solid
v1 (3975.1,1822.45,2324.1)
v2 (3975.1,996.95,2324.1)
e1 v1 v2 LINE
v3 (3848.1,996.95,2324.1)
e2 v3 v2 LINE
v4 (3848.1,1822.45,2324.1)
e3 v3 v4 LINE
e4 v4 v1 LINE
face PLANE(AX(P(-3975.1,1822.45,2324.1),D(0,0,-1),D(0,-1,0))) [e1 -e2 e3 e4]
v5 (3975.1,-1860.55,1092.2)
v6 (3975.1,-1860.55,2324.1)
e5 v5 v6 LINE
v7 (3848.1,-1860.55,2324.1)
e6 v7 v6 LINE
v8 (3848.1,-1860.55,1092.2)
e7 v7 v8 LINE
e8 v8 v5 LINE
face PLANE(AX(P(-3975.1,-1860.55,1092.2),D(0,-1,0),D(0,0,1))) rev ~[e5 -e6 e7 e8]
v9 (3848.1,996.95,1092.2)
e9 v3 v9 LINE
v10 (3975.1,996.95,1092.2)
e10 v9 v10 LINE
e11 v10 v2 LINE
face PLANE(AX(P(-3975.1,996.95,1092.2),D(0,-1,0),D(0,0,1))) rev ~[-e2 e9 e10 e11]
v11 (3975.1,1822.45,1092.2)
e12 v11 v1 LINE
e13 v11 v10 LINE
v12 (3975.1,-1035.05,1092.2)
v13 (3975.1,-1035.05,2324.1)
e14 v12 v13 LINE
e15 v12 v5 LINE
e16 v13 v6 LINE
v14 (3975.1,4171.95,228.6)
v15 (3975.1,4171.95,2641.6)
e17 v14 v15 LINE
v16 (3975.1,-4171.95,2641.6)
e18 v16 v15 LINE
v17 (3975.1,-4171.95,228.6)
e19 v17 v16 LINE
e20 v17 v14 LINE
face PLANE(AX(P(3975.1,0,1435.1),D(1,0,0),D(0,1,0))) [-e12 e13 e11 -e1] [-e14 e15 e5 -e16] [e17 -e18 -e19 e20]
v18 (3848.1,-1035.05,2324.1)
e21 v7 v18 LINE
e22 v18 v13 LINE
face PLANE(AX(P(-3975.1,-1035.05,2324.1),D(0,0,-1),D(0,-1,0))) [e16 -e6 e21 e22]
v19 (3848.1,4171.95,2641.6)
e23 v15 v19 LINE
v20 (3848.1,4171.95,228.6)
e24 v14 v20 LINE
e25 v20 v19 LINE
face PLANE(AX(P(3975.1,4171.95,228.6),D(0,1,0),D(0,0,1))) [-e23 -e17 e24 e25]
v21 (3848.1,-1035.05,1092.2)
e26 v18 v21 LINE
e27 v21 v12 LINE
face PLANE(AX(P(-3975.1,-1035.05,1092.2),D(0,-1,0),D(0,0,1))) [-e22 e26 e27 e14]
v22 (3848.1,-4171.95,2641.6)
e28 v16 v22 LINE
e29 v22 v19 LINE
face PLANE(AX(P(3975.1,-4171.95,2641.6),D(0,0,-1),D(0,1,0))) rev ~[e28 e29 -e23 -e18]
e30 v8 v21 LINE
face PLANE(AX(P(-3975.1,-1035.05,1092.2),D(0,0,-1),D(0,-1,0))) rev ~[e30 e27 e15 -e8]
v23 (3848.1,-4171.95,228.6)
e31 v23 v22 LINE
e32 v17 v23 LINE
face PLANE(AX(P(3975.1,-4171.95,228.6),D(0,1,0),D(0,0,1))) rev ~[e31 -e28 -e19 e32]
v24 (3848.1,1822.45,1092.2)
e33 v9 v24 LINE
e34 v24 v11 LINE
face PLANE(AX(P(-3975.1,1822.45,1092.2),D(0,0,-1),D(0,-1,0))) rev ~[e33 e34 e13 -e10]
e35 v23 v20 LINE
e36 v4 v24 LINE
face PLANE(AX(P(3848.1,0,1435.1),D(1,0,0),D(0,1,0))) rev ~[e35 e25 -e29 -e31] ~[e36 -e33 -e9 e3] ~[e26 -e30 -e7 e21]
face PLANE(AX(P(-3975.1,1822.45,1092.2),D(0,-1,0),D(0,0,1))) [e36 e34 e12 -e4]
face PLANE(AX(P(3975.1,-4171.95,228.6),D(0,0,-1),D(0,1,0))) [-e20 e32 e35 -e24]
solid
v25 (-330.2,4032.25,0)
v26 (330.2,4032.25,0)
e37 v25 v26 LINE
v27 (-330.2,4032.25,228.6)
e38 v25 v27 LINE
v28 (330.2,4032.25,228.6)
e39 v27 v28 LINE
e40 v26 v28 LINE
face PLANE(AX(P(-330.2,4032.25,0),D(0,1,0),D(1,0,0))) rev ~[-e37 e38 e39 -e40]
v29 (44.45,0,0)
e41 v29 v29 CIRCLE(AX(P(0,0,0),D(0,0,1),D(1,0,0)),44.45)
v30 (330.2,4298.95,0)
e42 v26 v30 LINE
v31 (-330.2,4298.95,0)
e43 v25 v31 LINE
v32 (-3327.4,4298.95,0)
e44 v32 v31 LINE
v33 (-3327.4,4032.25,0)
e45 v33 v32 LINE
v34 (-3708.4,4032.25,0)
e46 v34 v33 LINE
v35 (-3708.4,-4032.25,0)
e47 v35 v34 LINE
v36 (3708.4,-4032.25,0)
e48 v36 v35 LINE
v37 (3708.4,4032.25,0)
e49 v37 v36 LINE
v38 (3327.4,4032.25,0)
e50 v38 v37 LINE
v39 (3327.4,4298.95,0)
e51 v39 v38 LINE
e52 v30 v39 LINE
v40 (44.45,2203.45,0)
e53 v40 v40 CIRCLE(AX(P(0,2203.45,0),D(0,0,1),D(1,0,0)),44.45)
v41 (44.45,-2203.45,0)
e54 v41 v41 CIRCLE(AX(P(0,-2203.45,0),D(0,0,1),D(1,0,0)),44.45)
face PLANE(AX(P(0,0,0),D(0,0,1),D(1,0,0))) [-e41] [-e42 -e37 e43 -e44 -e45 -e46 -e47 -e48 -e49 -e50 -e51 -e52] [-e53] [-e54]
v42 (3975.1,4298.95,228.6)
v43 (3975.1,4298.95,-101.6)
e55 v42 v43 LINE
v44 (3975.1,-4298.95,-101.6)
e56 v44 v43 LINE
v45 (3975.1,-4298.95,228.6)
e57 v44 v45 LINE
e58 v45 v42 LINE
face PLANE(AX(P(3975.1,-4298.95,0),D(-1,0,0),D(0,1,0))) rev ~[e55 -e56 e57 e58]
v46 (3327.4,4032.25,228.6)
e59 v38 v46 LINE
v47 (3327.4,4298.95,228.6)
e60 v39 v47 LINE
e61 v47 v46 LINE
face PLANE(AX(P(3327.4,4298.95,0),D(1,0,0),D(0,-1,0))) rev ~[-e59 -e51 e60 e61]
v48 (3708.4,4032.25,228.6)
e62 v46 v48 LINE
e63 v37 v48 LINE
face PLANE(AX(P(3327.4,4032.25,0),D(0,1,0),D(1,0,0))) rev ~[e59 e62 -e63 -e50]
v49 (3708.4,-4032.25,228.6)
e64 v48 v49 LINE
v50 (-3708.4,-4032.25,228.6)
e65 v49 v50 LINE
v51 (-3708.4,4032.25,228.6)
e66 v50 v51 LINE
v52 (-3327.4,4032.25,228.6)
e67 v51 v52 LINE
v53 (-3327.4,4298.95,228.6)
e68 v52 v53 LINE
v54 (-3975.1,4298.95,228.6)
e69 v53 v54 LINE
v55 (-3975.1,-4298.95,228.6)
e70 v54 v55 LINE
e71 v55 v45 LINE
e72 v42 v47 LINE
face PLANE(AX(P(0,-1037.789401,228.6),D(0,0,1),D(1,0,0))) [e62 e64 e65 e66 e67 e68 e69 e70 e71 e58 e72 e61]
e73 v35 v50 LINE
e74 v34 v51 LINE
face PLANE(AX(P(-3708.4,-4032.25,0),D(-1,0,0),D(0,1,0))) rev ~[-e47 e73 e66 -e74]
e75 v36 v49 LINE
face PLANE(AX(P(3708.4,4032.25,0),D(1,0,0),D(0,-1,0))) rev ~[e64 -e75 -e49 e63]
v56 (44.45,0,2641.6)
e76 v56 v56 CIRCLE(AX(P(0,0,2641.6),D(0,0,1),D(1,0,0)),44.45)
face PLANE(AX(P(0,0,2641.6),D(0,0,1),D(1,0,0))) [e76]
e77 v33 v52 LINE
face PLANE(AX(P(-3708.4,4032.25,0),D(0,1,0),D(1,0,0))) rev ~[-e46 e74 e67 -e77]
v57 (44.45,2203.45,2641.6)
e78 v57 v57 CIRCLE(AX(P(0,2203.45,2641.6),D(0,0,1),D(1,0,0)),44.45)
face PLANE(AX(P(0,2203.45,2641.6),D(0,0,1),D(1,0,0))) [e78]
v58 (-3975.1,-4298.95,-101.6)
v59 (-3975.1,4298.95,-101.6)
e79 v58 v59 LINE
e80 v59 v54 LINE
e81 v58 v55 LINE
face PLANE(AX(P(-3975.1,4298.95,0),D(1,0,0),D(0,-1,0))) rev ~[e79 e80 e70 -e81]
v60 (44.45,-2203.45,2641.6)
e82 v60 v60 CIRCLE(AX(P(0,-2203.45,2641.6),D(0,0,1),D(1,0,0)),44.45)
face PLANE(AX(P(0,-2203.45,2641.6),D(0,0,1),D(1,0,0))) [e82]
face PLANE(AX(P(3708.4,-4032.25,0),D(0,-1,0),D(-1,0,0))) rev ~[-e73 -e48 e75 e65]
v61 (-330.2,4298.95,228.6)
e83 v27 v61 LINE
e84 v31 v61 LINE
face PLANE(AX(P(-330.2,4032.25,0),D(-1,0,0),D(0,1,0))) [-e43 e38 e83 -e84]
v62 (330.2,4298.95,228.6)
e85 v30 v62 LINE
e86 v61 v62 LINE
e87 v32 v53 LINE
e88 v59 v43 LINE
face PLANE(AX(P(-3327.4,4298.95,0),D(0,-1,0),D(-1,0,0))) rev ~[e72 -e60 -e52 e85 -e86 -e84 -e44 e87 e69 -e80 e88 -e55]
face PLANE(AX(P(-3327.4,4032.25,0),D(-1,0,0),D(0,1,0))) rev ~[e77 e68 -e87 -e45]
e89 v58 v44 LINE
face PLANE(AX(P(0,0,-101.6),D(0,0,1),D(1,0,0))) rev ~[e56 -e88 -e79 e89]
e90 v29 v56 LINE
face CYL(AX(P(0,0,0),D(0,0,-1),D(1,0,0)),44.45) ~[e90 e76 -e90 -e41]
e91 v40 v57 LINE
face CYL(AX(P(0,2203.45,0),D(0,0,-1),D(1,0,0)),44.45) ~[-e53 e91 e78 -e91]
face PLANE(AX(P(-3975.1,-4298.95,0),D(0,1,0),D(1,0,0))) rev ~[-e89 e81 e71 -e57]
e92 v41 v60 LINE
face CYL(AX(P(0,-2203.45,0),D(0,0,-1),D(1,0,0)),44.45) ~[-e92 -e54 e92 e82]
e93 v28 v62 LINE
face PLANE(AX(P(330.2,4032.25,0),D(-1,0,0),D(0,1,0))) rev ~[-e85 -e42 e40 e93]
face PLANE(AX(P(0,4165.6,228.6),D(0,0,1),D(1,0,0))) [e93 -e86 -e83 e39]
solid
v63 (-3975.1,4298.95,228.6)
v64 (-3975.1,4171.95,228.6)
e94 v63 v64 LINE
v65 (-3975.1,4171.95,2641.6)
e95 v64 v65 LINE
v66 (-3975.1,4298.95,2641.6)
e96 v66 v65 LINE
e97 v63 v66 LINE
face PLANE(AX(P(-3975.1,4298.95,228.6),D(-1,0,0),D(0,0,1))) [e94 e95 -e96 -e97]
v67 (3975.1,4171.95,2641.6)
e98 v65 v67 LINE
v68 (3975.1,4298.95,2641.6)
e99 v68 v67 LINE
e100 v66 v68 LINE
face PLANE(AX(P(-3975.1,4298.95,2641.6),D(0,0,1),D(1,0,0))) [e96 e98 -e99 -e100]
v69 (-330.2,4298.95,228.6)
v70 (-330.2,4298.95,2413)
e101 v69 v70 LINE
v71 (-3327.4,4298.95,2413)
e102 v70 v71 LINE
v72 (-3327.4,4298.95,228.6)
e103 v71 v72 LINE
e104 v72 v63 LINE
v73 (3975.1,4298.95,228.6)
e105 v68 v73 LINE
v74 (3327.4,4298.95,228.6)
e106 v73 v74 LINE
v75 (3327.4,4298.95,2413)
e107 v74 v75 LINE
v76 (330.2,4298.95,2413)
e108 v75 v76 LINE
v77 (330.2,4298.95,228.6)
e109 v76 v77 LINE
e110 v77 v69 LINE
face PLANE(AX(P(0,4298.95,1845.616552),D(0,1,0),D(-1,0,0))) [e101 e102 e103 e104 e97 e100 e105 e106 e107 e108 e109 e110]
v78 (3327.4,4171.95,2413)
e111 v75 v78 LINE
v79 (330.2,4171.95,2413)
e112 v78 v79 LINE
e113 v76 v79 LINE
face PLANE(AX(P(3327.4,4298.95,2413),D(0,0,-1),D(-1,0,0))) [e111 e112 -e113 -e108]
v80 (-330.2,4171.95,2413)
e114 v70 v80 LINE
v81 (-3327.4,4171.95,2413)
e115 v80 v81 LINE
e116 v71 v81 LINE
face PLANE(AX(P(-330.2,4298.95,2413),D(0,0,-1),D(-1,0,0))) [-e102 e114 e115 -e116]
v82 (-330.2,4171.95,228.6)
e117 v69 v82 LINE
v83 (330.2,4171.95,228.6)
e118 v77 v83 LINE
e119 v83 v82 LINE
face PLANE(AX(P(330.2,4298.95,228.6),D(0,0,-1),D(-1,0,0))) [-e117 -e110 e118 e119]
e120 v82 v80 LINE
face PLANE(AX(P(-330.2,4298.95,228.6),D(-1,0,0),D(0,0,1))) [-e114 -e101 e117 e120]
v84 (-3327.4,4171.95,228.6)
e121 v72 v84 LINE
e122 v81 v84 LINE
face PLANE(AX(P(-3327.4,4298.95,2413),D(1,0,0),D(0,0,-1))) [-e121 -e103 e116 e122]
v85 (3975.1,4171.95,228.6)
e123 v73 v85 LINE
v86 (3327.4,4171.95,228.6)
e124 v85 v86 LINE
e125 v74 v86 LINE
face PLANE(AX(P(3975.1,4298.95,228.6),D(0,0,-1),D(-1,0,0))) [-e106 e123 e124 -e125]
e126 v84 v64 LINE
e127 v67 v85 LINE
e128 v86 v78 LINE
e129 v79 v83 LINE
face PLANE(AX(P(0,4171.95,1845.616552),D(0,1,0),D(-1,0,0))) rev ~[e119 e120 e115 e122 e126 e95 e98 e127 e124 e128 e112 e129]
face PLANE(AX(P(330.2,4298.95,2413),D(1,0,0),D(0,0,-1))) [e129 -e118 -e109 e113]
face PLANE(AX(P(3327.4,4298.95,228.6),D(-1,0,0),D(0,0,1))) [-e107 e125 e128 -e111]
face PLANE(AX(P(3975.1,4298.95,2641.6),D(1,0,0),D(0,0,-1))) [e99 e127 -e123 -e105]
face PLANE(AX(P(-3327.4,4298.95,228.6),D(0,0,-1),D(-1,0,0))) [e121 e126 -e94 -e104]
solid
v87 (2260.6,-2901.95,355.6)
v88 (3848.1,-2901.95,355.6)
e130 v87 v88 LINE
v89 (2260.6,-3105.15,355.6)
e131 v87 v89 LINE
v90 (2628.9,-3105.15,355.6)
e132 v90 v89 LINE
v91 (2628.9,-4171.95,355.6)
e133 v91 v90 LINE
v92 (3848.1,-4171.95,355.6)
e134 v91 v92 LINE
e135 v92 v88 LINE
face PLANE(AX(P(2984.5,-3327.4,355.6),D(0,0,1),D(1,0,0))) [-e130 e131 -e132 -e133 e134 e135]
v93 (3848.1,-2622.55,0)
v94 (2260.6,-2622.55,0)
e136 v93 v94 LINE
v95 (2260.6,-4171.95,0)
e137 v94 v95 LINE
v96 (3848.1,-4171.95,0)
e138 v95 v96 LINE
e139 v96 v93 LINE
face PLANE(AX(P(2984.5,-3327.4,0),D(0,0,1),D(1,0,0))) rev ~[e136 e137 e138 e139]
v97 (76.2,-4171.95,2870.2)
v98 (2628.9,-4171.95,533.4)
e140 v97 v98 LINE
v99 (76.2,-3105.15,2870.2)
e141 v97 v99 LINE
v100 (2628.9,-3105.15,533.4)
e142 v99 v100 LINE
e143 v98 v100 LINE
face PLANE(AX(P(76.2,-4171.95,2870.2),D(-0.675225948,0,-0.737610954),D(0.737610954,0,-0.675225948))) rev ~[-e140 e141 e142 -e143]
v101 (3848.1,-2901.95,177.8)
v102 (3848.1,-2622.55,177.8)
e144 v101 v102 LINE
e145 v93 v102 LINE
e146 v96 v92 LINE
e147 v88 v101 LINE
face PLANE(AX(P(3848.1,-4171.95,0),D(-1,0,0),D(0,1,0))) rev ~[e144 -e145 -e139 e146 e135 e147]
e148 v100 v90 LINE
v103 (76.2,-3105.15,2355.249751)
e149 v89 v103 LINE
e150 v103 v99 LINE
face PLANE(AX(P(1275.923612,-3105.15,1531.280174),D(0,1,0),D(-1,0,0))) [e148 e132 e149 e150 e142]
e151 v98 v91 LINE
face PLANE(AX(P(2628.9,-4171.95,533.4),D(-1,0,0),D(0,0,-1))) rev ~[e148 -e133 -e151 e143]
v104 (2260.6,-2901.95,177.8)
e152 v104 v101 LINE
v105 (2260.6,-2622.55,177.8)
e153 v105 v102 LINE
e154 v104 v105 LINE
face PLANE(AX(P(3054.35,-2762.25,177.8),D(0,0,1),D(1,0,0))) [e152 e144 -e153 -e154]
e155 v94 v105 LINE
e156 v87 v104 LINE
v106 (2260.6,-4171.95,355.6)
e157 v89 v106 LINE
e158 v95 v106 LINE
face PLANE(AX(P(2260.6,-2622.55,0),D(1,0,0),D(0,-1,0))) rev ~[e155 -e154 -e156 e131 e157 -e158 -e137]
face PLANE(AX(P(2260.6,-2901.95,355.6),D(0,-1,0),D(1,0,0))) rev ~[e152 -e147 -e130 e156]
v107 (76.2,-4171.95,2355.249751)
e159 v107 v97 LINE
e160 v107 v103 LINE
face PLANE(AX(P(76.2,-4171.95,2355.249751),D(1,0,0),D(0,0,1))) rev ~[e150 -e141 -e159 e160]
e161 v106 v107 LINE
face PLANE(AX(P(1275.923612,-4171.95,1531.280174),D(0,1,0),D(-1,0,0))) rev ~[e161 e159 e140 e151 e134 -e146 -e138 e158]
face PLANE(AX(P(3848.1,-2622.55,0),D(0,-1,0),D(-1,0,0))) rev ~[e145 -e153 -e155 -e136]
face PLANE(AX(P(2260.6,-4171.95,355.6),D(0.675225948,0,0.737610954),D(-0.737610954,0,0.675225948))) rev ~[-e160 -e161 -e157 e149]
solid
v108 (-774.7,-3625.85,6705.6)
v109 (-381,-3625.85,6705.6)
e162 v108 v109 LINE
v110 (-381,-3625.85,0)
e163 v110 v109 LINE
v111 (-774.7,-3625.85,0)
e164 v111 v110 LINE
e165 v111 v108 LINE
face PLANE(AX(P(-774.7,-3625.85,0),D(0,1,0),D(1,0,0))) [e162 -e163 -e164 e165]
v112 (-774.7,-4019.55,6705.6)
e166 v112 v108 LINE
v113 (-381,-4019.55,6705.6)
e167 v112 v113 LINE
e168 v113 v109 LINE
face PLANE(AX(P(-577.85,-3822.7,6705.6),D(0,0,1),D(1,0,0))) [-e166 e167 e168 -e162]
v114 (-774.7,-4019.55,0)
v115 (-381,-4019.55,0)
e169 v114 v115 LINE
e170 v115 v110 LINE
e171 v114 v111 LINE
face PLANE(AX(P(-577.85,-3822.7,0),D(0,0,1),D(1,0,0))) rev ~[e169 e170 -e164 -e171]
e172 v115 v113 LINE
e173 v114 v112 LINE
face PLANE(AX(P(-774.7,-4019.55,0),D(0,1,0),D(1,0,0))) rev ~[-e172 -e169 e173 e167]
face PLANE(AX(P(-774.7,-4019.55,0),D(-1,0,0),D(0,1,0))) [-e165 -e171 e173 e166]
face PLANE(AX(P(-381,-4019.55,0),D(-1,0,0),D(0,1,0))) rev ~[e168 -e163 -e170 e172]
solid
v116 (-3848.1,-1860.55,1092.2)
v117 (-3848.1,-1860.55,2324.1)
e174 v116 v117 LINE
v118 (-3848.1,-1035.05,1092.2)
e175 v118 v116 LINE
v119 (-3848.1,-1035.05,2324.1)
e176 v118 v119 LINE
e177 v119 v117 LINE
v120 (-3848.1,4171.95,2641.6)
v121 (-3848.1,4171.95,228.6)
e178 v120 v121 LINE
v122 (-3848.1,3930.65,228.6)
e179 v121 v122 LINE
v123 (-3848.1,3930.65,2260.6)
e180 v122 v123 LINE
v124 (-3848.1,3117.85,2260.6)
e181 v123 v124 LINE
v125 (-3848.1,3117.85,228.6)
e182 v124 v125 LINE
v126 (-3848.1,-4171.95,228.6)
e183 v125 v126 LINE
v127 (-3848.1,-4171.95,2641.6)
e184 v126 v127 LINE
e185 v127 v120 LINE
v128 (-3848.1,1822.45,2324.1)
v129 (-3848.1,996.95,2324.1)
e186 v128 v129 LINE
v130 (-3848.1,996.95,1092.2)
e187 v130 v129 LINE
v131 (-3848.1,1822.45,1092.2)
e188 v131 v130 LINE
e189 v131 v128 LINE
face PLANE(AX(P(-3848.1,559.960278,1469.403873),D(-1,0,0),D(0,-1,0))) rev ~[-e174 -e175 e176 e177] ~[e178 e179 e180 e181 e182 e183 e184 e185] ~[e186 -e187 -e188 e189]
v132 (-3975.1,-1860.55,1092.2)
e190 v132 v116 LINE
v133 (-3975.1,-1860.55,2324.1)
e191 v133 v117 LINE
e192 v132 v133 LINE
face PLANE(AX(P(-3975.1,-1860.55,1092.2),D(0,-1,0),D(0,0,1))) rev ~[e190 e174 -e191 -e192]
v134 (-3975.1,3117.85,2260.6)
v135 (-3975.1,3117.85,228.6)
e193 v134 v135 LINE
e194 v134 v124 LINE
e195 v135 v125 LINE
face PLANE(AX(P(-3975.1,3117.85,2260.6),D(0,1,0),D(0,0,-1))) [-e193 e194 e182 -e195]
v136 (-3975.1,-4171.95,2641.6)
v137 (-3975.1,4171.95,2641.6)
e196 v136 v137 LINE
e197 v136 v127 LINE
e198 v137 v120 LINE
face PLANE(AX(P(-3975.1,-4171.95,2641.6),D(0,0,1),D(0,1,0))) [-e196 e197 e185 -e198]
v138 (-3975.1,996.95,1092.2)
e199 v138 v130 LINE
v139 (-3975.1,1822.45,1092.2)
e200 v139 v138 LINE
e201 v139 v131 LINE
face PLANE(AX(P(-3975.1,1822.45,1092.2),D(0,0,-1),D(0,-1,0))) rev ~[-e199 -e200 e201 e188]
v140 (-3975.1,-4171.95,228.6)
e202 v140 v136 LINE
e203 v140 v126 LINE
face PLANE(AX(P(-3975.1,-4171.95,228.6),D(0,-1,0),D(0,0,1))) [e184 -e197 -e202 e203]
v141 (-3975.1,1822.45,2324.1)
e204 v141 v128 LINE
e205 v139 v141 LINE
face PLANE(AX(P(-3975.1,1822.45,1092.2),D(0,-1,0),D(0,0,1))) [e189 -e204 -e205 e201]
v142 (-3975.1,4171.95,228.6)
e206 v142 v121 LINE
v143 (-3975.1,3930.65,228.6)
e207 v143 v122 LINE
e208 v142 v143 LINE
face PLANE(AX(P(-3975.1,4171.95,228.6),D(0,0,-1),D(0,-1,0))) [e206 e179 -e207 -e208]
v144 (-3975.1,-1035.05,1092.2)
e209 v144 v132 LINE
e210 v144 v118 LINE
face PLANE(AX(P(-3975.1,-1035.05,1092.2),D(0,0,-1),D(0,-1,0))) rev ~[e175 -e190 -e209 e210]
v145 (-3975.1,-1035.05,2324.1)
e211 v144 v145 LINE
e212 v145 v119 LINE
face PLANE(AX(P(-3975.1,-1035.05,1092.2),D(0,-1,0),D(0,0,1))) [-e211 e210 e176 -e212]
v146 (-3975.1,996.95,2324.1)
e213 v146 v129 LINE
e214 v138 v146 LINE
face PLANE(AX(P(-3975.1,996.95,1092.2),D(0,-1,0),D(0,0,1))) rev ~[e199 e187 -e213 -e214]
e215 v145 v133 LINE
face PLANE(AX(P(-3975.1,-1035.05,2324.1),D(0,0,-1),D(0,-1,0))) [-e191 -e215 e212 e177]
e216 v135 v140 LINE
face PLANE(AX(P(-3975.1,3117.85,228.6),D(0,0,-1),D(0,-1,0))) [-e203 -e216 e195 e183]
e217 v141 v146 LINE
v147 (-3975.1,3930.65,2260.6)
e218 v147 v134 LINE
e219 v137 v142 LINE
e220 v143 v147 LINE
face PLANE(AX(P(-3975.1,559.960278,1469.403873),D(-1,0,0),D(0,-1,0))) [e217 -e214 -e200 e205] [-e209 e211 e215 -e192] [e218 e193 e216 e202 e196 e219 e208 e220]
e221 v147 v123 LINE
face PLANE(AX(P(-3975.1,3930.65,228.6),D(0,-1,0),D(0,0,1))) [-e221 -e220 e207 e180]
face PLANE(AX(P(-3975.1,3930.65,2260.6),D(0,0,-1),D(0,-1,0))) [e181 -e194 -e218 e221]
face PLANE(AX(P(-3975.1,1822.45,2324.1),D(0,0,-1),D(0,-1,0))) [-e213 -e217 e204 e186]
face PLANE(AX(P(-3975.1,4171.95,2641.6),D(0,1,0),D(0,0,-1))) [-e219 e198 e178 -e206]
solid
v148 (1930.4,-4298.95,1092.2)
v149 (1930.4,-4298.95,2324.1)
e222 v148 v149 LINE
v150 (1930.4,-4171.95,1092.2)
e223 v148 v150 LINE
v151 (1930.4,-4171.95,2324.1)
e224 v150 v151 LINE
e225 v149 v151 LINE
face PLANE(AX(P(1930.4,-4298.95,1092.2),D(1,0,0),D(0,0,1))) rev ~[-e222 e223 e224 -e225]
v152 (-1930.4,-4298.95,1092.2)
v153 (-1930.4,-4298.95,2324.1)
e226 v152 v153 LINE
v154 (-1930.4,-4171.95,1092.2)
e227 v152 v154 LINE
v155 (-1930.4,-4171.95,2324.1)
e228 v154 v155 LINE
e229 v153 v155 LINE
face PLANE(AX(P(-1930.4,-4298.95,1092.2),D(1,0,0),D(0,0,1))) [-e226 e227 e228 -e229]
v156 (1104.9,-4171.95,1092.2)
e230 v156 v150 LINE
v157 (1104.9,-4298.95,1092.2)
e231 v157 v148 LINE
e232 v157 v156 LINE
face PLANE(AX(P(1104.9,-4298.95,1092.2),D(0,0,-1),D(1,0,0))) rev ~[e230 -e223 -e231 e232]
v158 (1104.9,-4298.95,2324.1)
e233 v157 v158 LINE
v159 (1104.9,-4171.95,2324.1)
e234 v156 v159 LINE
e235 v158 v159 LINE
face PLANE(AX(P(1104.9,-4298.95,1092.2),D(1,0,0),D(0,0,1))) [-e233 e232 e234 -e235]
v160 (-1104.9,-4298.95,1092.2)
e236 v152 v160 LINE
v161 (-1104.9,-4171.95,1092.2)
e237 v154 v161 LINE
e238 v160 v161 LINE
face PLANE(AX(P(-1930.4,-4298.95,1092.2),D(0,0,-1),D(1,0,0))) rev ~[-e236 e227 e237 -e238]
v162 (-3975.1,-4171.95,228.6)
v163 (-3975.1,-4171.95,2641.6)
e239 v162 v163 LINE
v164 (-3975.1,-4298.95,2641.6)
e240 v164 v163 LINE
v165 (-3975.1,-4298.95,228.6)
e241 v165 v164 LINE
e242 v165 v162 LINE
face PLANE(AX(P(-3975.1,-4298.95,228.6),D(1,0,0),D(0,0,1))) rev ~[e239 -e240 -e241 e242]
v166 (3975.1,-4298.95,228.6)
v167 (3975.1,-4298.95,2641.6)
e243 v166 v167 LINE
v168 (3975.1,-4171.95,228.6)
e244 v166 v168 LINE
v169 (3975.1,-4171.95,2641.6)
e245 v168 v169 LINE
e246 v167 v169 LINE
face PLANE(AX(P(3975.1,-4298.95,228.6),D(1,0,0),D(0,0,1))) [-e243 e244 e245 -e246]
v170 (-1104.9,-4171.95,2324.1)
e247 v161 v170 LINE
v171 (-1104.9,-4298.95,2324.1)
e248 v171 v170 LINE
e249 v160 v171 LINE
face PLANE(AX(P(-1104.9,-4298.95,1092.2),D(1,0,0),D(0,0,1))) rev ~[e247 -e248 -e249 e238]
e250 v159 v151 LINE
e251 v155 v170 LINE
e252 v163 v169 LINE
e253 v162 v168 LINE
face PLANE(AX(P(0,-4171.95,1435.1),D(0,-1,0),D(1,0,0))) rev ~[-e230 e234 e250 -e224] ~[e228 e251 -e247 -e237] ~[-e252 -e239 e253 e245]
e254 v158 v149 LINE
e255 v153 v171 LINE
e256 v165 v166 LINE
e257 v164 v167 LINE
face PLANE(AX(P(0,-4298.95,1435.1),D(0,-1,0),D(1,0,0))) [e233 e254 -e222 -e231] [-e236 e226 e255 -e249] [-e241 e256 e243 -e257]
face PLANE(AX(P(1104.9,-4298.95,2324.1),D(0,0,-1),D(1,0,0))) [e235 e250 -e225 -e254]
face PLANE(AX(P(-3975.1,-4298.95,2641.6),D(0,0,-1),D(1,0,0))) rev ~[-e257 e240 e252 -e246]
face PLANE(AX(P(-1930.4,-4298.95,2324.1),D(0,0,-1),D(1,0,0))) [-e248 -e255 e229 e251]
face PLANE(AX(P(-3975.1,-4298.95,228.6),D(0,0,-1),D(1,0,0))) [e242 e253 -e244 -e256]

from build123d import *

# Parameters (mm, degrees)
F0_W      = 7950.2
F0_H      = 8597.9
F1_DEPTH  = 101.6
F2_W      = 660.4
F2_H      = 266.7
F3_DEPTH  = 228.6
F5_DEPTH  = 127
F6_W      = 7950.2
F6_H      = 2413
F6_W_2    = 825.5
F6_H_2    = 1231.9
F7_DEPTH  = 127
F8_W      = 825.5
F8_H      = 1231.9
F9_DEPTH  = 127
F10_W     = 8343.9
F10_H     = 2413
F11_DEPTH = 127
F12_DEPTH = 7950.2
F13_W     = 393.7
F13_H     = 393.7
F14_DEPTH = 6705.6
F15_W     = 1447.8
F15_H     = 1409.7
F16_DEPTH = 355.6
F17_W     = 1587.5
F17_H     = 279.4
F18_DEPTH = 177.8
F20_DEPTH = 1066.8
F21_R     = 44.45
F22_DEPTH = 2641.6


# Not quite as in the source:
# - a feature names something its author has since deleted; it is built from what else it names


with BuildPart() as f1:
    # F0 (on Top) → F1 (new body)
    with BuildSketch(Plane.XY):
        Rectangle(F0_W, F0_H)
    extrude(amount=-F1_DEPTH)

    # F2 (on face) → F3 (join)
    with BuildSketch(Plane.XY):
        Polygon((-3327.4, 4032.25), (-3327.4, 4298.95), (-3975.1, 4298.95), (-3975.1, -4298.95), (3975.1, -4298.95), (3975.1, 4298.95), (3327.4, 4298.95), (3327.4, 4032.25), (3708.4, 4032.25), (3708.4, -4032.25), (-3708.4, -4032.25), (-3708.4, 4032.25), align=None)
        with Locations((0, 4165.6)):
            Rectangle(F2_W, F2_H)
    extrude(amount=F3_DEPTH)

    # F21 (on face) → F22 (join, through all)
    with BuildSketch(Plane.XY):
        with Locations((0, 2203.45)):
            Circle(F21_R)
        Circle(F21_R)
        with Locations((0, -2203.45)):
            Circle(F21_R)
    extrude(amount=F22_DEPTH)


with BuildPart() as f5:
    # F4 (on face) → F5 (new body)
    with BuildSketch(Plane(origin=(0, 4298.95, 0), x_dir=(-1, 0, 0), z_dir=(0, 1, 0))):
        Polygon((-3975.1, 2641.6), (-3975.1, 228.6), (-3327.4, 228.6), (-3327.4, 2413), (-330.2, 2413), (-330.2, 228.6), (330.2, 228.6), (330.2, 2413), (3327.4, 2413), (3327.4, 228.6), (3975.1, 228.6), (3975.1, 2641.6), align=None)
    extrude(amount=-F5_DEPTH)


with BuildPart() as f7:
    # F6 (on face) → F7 (new body)
    with BuildSketch(Plane.XZ.offset(4298.95)):
        with Locations((0, 1435.1)):
            Rectangle(F6_W, F6_H)
        with Locations((-1517.65, 1708.15)):
            Rectangle(F6_W_2, F6_H_2, mode=Mode.SUBTRACT)
        with Locations((1517.65, 1708.15)):
            Rectangle(F6_W_2, F6_H_2, mode=Mode.SUBTRACT)
    extrude(amount=-F7_DEPTH)


with BuildPart() as f9:
    # F8 (on face) → F9 (new body)
    with BuildSketch(Plane(origin=(-3975.1, 0, 0), x_dir=(0, -1, 0), z_dir=(-1, 0, 0))):
        Polygon((4171.95, 2641.6), (-4171.95, 2641.6), (-4171.95, 228.6), (-3930.65, 228.6), (-3930.65, 2260.6), (-3117.85, 2260.6), (-3117.85, 228.6), (4171.95, 228.6), align=None)
        with Locations((-1409.7, 1708.15)):
            Rectangle(F8_W, F8_H, mode=Mode.SUBTRACT)
        with Locations((1447.8, 1708.15)):
            Rectangle(F8_W, F8_H, mode=Mode.SUBTRACT)
    extrude(amount=-F9_DEPTH)


with BuildPart() as f11:
    # F10 (on face) → F11 (new body)
    with BuildSketch(Plane.YZ.offset(3975.1)):
        with Locations((0, 1435.1)):
            Rectangle(F10_W, F10_H)
    extrude(amount=-F11_DEPTH)

    # F8 (on face) → F12 (cut, through all)
    with BuildSketch(Plane(origin=(-3975.1, 0, 0), x_dir=(0, -1, 0), z_dir=(-1, 0, 0))):
        with Locations((-1409.7, 1708.15)):
            Rectangle(F8_W, F8_H)
        with Locations((1447.8, 1708.15)):
            Rectangle(F8_W, F8_H)
    extrude(amount=-F12_DEPTH, mode=Mode.SUBTRACT)


with BuildPart() as f14:
    # F13 (on face) → F14 (new body)
    with BuildSketch(Plane.XY):
        with Locations((-577.85, -3822.7)):
            Rectangle(F13_W, F13_H)
    extrude(amount=F14_DEPTH)


with BuildPart() as f16:
    # F15 (on face) → F16 (new body)
    with BuildSketch(Plane.XY):
        with Locations((2984.5, -3327.4)):
            Rectangle(F15_W, F15_H)
        Polygon((2260.6, -4171.95), (3848.1, -4171.95), (3848.1, -2622.55), (3708.4, -2622.55), (3708.4, -4032.25), (2260.6, -4032.25), align=None)
    extrude(amount=F16_DEPTH)

    # F17 (on face) → F18 (cut)
    with BuildSketch(Plane.XY.offset(355.6)):
        with Locations((3054.35, -2762.25)):
            Rectangle(F17_W, F17_H)
    extrude(amount=-F18_DEPTH, mode=Mode.SUBTRACT)

    # F19 (on face) → F20 (join)
    with BuildSketch(Plane(origin=(0, -4171.95, 0), x_dir=(-1, 0, 0), z_dir=(0, 1, 0))):
        Polygon((-2628.9, 355.6), (-2260.6, 355.6), (-76.2, 2355.2497512438), (-76.2, 2870.2), (-2628.9, 533.4), align=None)
    extrude(amount=F20_DEPTH)


solid = Compound([f1.part, f5.part, f7.part, f9.part, f11.part, f14.part, f16.part])
